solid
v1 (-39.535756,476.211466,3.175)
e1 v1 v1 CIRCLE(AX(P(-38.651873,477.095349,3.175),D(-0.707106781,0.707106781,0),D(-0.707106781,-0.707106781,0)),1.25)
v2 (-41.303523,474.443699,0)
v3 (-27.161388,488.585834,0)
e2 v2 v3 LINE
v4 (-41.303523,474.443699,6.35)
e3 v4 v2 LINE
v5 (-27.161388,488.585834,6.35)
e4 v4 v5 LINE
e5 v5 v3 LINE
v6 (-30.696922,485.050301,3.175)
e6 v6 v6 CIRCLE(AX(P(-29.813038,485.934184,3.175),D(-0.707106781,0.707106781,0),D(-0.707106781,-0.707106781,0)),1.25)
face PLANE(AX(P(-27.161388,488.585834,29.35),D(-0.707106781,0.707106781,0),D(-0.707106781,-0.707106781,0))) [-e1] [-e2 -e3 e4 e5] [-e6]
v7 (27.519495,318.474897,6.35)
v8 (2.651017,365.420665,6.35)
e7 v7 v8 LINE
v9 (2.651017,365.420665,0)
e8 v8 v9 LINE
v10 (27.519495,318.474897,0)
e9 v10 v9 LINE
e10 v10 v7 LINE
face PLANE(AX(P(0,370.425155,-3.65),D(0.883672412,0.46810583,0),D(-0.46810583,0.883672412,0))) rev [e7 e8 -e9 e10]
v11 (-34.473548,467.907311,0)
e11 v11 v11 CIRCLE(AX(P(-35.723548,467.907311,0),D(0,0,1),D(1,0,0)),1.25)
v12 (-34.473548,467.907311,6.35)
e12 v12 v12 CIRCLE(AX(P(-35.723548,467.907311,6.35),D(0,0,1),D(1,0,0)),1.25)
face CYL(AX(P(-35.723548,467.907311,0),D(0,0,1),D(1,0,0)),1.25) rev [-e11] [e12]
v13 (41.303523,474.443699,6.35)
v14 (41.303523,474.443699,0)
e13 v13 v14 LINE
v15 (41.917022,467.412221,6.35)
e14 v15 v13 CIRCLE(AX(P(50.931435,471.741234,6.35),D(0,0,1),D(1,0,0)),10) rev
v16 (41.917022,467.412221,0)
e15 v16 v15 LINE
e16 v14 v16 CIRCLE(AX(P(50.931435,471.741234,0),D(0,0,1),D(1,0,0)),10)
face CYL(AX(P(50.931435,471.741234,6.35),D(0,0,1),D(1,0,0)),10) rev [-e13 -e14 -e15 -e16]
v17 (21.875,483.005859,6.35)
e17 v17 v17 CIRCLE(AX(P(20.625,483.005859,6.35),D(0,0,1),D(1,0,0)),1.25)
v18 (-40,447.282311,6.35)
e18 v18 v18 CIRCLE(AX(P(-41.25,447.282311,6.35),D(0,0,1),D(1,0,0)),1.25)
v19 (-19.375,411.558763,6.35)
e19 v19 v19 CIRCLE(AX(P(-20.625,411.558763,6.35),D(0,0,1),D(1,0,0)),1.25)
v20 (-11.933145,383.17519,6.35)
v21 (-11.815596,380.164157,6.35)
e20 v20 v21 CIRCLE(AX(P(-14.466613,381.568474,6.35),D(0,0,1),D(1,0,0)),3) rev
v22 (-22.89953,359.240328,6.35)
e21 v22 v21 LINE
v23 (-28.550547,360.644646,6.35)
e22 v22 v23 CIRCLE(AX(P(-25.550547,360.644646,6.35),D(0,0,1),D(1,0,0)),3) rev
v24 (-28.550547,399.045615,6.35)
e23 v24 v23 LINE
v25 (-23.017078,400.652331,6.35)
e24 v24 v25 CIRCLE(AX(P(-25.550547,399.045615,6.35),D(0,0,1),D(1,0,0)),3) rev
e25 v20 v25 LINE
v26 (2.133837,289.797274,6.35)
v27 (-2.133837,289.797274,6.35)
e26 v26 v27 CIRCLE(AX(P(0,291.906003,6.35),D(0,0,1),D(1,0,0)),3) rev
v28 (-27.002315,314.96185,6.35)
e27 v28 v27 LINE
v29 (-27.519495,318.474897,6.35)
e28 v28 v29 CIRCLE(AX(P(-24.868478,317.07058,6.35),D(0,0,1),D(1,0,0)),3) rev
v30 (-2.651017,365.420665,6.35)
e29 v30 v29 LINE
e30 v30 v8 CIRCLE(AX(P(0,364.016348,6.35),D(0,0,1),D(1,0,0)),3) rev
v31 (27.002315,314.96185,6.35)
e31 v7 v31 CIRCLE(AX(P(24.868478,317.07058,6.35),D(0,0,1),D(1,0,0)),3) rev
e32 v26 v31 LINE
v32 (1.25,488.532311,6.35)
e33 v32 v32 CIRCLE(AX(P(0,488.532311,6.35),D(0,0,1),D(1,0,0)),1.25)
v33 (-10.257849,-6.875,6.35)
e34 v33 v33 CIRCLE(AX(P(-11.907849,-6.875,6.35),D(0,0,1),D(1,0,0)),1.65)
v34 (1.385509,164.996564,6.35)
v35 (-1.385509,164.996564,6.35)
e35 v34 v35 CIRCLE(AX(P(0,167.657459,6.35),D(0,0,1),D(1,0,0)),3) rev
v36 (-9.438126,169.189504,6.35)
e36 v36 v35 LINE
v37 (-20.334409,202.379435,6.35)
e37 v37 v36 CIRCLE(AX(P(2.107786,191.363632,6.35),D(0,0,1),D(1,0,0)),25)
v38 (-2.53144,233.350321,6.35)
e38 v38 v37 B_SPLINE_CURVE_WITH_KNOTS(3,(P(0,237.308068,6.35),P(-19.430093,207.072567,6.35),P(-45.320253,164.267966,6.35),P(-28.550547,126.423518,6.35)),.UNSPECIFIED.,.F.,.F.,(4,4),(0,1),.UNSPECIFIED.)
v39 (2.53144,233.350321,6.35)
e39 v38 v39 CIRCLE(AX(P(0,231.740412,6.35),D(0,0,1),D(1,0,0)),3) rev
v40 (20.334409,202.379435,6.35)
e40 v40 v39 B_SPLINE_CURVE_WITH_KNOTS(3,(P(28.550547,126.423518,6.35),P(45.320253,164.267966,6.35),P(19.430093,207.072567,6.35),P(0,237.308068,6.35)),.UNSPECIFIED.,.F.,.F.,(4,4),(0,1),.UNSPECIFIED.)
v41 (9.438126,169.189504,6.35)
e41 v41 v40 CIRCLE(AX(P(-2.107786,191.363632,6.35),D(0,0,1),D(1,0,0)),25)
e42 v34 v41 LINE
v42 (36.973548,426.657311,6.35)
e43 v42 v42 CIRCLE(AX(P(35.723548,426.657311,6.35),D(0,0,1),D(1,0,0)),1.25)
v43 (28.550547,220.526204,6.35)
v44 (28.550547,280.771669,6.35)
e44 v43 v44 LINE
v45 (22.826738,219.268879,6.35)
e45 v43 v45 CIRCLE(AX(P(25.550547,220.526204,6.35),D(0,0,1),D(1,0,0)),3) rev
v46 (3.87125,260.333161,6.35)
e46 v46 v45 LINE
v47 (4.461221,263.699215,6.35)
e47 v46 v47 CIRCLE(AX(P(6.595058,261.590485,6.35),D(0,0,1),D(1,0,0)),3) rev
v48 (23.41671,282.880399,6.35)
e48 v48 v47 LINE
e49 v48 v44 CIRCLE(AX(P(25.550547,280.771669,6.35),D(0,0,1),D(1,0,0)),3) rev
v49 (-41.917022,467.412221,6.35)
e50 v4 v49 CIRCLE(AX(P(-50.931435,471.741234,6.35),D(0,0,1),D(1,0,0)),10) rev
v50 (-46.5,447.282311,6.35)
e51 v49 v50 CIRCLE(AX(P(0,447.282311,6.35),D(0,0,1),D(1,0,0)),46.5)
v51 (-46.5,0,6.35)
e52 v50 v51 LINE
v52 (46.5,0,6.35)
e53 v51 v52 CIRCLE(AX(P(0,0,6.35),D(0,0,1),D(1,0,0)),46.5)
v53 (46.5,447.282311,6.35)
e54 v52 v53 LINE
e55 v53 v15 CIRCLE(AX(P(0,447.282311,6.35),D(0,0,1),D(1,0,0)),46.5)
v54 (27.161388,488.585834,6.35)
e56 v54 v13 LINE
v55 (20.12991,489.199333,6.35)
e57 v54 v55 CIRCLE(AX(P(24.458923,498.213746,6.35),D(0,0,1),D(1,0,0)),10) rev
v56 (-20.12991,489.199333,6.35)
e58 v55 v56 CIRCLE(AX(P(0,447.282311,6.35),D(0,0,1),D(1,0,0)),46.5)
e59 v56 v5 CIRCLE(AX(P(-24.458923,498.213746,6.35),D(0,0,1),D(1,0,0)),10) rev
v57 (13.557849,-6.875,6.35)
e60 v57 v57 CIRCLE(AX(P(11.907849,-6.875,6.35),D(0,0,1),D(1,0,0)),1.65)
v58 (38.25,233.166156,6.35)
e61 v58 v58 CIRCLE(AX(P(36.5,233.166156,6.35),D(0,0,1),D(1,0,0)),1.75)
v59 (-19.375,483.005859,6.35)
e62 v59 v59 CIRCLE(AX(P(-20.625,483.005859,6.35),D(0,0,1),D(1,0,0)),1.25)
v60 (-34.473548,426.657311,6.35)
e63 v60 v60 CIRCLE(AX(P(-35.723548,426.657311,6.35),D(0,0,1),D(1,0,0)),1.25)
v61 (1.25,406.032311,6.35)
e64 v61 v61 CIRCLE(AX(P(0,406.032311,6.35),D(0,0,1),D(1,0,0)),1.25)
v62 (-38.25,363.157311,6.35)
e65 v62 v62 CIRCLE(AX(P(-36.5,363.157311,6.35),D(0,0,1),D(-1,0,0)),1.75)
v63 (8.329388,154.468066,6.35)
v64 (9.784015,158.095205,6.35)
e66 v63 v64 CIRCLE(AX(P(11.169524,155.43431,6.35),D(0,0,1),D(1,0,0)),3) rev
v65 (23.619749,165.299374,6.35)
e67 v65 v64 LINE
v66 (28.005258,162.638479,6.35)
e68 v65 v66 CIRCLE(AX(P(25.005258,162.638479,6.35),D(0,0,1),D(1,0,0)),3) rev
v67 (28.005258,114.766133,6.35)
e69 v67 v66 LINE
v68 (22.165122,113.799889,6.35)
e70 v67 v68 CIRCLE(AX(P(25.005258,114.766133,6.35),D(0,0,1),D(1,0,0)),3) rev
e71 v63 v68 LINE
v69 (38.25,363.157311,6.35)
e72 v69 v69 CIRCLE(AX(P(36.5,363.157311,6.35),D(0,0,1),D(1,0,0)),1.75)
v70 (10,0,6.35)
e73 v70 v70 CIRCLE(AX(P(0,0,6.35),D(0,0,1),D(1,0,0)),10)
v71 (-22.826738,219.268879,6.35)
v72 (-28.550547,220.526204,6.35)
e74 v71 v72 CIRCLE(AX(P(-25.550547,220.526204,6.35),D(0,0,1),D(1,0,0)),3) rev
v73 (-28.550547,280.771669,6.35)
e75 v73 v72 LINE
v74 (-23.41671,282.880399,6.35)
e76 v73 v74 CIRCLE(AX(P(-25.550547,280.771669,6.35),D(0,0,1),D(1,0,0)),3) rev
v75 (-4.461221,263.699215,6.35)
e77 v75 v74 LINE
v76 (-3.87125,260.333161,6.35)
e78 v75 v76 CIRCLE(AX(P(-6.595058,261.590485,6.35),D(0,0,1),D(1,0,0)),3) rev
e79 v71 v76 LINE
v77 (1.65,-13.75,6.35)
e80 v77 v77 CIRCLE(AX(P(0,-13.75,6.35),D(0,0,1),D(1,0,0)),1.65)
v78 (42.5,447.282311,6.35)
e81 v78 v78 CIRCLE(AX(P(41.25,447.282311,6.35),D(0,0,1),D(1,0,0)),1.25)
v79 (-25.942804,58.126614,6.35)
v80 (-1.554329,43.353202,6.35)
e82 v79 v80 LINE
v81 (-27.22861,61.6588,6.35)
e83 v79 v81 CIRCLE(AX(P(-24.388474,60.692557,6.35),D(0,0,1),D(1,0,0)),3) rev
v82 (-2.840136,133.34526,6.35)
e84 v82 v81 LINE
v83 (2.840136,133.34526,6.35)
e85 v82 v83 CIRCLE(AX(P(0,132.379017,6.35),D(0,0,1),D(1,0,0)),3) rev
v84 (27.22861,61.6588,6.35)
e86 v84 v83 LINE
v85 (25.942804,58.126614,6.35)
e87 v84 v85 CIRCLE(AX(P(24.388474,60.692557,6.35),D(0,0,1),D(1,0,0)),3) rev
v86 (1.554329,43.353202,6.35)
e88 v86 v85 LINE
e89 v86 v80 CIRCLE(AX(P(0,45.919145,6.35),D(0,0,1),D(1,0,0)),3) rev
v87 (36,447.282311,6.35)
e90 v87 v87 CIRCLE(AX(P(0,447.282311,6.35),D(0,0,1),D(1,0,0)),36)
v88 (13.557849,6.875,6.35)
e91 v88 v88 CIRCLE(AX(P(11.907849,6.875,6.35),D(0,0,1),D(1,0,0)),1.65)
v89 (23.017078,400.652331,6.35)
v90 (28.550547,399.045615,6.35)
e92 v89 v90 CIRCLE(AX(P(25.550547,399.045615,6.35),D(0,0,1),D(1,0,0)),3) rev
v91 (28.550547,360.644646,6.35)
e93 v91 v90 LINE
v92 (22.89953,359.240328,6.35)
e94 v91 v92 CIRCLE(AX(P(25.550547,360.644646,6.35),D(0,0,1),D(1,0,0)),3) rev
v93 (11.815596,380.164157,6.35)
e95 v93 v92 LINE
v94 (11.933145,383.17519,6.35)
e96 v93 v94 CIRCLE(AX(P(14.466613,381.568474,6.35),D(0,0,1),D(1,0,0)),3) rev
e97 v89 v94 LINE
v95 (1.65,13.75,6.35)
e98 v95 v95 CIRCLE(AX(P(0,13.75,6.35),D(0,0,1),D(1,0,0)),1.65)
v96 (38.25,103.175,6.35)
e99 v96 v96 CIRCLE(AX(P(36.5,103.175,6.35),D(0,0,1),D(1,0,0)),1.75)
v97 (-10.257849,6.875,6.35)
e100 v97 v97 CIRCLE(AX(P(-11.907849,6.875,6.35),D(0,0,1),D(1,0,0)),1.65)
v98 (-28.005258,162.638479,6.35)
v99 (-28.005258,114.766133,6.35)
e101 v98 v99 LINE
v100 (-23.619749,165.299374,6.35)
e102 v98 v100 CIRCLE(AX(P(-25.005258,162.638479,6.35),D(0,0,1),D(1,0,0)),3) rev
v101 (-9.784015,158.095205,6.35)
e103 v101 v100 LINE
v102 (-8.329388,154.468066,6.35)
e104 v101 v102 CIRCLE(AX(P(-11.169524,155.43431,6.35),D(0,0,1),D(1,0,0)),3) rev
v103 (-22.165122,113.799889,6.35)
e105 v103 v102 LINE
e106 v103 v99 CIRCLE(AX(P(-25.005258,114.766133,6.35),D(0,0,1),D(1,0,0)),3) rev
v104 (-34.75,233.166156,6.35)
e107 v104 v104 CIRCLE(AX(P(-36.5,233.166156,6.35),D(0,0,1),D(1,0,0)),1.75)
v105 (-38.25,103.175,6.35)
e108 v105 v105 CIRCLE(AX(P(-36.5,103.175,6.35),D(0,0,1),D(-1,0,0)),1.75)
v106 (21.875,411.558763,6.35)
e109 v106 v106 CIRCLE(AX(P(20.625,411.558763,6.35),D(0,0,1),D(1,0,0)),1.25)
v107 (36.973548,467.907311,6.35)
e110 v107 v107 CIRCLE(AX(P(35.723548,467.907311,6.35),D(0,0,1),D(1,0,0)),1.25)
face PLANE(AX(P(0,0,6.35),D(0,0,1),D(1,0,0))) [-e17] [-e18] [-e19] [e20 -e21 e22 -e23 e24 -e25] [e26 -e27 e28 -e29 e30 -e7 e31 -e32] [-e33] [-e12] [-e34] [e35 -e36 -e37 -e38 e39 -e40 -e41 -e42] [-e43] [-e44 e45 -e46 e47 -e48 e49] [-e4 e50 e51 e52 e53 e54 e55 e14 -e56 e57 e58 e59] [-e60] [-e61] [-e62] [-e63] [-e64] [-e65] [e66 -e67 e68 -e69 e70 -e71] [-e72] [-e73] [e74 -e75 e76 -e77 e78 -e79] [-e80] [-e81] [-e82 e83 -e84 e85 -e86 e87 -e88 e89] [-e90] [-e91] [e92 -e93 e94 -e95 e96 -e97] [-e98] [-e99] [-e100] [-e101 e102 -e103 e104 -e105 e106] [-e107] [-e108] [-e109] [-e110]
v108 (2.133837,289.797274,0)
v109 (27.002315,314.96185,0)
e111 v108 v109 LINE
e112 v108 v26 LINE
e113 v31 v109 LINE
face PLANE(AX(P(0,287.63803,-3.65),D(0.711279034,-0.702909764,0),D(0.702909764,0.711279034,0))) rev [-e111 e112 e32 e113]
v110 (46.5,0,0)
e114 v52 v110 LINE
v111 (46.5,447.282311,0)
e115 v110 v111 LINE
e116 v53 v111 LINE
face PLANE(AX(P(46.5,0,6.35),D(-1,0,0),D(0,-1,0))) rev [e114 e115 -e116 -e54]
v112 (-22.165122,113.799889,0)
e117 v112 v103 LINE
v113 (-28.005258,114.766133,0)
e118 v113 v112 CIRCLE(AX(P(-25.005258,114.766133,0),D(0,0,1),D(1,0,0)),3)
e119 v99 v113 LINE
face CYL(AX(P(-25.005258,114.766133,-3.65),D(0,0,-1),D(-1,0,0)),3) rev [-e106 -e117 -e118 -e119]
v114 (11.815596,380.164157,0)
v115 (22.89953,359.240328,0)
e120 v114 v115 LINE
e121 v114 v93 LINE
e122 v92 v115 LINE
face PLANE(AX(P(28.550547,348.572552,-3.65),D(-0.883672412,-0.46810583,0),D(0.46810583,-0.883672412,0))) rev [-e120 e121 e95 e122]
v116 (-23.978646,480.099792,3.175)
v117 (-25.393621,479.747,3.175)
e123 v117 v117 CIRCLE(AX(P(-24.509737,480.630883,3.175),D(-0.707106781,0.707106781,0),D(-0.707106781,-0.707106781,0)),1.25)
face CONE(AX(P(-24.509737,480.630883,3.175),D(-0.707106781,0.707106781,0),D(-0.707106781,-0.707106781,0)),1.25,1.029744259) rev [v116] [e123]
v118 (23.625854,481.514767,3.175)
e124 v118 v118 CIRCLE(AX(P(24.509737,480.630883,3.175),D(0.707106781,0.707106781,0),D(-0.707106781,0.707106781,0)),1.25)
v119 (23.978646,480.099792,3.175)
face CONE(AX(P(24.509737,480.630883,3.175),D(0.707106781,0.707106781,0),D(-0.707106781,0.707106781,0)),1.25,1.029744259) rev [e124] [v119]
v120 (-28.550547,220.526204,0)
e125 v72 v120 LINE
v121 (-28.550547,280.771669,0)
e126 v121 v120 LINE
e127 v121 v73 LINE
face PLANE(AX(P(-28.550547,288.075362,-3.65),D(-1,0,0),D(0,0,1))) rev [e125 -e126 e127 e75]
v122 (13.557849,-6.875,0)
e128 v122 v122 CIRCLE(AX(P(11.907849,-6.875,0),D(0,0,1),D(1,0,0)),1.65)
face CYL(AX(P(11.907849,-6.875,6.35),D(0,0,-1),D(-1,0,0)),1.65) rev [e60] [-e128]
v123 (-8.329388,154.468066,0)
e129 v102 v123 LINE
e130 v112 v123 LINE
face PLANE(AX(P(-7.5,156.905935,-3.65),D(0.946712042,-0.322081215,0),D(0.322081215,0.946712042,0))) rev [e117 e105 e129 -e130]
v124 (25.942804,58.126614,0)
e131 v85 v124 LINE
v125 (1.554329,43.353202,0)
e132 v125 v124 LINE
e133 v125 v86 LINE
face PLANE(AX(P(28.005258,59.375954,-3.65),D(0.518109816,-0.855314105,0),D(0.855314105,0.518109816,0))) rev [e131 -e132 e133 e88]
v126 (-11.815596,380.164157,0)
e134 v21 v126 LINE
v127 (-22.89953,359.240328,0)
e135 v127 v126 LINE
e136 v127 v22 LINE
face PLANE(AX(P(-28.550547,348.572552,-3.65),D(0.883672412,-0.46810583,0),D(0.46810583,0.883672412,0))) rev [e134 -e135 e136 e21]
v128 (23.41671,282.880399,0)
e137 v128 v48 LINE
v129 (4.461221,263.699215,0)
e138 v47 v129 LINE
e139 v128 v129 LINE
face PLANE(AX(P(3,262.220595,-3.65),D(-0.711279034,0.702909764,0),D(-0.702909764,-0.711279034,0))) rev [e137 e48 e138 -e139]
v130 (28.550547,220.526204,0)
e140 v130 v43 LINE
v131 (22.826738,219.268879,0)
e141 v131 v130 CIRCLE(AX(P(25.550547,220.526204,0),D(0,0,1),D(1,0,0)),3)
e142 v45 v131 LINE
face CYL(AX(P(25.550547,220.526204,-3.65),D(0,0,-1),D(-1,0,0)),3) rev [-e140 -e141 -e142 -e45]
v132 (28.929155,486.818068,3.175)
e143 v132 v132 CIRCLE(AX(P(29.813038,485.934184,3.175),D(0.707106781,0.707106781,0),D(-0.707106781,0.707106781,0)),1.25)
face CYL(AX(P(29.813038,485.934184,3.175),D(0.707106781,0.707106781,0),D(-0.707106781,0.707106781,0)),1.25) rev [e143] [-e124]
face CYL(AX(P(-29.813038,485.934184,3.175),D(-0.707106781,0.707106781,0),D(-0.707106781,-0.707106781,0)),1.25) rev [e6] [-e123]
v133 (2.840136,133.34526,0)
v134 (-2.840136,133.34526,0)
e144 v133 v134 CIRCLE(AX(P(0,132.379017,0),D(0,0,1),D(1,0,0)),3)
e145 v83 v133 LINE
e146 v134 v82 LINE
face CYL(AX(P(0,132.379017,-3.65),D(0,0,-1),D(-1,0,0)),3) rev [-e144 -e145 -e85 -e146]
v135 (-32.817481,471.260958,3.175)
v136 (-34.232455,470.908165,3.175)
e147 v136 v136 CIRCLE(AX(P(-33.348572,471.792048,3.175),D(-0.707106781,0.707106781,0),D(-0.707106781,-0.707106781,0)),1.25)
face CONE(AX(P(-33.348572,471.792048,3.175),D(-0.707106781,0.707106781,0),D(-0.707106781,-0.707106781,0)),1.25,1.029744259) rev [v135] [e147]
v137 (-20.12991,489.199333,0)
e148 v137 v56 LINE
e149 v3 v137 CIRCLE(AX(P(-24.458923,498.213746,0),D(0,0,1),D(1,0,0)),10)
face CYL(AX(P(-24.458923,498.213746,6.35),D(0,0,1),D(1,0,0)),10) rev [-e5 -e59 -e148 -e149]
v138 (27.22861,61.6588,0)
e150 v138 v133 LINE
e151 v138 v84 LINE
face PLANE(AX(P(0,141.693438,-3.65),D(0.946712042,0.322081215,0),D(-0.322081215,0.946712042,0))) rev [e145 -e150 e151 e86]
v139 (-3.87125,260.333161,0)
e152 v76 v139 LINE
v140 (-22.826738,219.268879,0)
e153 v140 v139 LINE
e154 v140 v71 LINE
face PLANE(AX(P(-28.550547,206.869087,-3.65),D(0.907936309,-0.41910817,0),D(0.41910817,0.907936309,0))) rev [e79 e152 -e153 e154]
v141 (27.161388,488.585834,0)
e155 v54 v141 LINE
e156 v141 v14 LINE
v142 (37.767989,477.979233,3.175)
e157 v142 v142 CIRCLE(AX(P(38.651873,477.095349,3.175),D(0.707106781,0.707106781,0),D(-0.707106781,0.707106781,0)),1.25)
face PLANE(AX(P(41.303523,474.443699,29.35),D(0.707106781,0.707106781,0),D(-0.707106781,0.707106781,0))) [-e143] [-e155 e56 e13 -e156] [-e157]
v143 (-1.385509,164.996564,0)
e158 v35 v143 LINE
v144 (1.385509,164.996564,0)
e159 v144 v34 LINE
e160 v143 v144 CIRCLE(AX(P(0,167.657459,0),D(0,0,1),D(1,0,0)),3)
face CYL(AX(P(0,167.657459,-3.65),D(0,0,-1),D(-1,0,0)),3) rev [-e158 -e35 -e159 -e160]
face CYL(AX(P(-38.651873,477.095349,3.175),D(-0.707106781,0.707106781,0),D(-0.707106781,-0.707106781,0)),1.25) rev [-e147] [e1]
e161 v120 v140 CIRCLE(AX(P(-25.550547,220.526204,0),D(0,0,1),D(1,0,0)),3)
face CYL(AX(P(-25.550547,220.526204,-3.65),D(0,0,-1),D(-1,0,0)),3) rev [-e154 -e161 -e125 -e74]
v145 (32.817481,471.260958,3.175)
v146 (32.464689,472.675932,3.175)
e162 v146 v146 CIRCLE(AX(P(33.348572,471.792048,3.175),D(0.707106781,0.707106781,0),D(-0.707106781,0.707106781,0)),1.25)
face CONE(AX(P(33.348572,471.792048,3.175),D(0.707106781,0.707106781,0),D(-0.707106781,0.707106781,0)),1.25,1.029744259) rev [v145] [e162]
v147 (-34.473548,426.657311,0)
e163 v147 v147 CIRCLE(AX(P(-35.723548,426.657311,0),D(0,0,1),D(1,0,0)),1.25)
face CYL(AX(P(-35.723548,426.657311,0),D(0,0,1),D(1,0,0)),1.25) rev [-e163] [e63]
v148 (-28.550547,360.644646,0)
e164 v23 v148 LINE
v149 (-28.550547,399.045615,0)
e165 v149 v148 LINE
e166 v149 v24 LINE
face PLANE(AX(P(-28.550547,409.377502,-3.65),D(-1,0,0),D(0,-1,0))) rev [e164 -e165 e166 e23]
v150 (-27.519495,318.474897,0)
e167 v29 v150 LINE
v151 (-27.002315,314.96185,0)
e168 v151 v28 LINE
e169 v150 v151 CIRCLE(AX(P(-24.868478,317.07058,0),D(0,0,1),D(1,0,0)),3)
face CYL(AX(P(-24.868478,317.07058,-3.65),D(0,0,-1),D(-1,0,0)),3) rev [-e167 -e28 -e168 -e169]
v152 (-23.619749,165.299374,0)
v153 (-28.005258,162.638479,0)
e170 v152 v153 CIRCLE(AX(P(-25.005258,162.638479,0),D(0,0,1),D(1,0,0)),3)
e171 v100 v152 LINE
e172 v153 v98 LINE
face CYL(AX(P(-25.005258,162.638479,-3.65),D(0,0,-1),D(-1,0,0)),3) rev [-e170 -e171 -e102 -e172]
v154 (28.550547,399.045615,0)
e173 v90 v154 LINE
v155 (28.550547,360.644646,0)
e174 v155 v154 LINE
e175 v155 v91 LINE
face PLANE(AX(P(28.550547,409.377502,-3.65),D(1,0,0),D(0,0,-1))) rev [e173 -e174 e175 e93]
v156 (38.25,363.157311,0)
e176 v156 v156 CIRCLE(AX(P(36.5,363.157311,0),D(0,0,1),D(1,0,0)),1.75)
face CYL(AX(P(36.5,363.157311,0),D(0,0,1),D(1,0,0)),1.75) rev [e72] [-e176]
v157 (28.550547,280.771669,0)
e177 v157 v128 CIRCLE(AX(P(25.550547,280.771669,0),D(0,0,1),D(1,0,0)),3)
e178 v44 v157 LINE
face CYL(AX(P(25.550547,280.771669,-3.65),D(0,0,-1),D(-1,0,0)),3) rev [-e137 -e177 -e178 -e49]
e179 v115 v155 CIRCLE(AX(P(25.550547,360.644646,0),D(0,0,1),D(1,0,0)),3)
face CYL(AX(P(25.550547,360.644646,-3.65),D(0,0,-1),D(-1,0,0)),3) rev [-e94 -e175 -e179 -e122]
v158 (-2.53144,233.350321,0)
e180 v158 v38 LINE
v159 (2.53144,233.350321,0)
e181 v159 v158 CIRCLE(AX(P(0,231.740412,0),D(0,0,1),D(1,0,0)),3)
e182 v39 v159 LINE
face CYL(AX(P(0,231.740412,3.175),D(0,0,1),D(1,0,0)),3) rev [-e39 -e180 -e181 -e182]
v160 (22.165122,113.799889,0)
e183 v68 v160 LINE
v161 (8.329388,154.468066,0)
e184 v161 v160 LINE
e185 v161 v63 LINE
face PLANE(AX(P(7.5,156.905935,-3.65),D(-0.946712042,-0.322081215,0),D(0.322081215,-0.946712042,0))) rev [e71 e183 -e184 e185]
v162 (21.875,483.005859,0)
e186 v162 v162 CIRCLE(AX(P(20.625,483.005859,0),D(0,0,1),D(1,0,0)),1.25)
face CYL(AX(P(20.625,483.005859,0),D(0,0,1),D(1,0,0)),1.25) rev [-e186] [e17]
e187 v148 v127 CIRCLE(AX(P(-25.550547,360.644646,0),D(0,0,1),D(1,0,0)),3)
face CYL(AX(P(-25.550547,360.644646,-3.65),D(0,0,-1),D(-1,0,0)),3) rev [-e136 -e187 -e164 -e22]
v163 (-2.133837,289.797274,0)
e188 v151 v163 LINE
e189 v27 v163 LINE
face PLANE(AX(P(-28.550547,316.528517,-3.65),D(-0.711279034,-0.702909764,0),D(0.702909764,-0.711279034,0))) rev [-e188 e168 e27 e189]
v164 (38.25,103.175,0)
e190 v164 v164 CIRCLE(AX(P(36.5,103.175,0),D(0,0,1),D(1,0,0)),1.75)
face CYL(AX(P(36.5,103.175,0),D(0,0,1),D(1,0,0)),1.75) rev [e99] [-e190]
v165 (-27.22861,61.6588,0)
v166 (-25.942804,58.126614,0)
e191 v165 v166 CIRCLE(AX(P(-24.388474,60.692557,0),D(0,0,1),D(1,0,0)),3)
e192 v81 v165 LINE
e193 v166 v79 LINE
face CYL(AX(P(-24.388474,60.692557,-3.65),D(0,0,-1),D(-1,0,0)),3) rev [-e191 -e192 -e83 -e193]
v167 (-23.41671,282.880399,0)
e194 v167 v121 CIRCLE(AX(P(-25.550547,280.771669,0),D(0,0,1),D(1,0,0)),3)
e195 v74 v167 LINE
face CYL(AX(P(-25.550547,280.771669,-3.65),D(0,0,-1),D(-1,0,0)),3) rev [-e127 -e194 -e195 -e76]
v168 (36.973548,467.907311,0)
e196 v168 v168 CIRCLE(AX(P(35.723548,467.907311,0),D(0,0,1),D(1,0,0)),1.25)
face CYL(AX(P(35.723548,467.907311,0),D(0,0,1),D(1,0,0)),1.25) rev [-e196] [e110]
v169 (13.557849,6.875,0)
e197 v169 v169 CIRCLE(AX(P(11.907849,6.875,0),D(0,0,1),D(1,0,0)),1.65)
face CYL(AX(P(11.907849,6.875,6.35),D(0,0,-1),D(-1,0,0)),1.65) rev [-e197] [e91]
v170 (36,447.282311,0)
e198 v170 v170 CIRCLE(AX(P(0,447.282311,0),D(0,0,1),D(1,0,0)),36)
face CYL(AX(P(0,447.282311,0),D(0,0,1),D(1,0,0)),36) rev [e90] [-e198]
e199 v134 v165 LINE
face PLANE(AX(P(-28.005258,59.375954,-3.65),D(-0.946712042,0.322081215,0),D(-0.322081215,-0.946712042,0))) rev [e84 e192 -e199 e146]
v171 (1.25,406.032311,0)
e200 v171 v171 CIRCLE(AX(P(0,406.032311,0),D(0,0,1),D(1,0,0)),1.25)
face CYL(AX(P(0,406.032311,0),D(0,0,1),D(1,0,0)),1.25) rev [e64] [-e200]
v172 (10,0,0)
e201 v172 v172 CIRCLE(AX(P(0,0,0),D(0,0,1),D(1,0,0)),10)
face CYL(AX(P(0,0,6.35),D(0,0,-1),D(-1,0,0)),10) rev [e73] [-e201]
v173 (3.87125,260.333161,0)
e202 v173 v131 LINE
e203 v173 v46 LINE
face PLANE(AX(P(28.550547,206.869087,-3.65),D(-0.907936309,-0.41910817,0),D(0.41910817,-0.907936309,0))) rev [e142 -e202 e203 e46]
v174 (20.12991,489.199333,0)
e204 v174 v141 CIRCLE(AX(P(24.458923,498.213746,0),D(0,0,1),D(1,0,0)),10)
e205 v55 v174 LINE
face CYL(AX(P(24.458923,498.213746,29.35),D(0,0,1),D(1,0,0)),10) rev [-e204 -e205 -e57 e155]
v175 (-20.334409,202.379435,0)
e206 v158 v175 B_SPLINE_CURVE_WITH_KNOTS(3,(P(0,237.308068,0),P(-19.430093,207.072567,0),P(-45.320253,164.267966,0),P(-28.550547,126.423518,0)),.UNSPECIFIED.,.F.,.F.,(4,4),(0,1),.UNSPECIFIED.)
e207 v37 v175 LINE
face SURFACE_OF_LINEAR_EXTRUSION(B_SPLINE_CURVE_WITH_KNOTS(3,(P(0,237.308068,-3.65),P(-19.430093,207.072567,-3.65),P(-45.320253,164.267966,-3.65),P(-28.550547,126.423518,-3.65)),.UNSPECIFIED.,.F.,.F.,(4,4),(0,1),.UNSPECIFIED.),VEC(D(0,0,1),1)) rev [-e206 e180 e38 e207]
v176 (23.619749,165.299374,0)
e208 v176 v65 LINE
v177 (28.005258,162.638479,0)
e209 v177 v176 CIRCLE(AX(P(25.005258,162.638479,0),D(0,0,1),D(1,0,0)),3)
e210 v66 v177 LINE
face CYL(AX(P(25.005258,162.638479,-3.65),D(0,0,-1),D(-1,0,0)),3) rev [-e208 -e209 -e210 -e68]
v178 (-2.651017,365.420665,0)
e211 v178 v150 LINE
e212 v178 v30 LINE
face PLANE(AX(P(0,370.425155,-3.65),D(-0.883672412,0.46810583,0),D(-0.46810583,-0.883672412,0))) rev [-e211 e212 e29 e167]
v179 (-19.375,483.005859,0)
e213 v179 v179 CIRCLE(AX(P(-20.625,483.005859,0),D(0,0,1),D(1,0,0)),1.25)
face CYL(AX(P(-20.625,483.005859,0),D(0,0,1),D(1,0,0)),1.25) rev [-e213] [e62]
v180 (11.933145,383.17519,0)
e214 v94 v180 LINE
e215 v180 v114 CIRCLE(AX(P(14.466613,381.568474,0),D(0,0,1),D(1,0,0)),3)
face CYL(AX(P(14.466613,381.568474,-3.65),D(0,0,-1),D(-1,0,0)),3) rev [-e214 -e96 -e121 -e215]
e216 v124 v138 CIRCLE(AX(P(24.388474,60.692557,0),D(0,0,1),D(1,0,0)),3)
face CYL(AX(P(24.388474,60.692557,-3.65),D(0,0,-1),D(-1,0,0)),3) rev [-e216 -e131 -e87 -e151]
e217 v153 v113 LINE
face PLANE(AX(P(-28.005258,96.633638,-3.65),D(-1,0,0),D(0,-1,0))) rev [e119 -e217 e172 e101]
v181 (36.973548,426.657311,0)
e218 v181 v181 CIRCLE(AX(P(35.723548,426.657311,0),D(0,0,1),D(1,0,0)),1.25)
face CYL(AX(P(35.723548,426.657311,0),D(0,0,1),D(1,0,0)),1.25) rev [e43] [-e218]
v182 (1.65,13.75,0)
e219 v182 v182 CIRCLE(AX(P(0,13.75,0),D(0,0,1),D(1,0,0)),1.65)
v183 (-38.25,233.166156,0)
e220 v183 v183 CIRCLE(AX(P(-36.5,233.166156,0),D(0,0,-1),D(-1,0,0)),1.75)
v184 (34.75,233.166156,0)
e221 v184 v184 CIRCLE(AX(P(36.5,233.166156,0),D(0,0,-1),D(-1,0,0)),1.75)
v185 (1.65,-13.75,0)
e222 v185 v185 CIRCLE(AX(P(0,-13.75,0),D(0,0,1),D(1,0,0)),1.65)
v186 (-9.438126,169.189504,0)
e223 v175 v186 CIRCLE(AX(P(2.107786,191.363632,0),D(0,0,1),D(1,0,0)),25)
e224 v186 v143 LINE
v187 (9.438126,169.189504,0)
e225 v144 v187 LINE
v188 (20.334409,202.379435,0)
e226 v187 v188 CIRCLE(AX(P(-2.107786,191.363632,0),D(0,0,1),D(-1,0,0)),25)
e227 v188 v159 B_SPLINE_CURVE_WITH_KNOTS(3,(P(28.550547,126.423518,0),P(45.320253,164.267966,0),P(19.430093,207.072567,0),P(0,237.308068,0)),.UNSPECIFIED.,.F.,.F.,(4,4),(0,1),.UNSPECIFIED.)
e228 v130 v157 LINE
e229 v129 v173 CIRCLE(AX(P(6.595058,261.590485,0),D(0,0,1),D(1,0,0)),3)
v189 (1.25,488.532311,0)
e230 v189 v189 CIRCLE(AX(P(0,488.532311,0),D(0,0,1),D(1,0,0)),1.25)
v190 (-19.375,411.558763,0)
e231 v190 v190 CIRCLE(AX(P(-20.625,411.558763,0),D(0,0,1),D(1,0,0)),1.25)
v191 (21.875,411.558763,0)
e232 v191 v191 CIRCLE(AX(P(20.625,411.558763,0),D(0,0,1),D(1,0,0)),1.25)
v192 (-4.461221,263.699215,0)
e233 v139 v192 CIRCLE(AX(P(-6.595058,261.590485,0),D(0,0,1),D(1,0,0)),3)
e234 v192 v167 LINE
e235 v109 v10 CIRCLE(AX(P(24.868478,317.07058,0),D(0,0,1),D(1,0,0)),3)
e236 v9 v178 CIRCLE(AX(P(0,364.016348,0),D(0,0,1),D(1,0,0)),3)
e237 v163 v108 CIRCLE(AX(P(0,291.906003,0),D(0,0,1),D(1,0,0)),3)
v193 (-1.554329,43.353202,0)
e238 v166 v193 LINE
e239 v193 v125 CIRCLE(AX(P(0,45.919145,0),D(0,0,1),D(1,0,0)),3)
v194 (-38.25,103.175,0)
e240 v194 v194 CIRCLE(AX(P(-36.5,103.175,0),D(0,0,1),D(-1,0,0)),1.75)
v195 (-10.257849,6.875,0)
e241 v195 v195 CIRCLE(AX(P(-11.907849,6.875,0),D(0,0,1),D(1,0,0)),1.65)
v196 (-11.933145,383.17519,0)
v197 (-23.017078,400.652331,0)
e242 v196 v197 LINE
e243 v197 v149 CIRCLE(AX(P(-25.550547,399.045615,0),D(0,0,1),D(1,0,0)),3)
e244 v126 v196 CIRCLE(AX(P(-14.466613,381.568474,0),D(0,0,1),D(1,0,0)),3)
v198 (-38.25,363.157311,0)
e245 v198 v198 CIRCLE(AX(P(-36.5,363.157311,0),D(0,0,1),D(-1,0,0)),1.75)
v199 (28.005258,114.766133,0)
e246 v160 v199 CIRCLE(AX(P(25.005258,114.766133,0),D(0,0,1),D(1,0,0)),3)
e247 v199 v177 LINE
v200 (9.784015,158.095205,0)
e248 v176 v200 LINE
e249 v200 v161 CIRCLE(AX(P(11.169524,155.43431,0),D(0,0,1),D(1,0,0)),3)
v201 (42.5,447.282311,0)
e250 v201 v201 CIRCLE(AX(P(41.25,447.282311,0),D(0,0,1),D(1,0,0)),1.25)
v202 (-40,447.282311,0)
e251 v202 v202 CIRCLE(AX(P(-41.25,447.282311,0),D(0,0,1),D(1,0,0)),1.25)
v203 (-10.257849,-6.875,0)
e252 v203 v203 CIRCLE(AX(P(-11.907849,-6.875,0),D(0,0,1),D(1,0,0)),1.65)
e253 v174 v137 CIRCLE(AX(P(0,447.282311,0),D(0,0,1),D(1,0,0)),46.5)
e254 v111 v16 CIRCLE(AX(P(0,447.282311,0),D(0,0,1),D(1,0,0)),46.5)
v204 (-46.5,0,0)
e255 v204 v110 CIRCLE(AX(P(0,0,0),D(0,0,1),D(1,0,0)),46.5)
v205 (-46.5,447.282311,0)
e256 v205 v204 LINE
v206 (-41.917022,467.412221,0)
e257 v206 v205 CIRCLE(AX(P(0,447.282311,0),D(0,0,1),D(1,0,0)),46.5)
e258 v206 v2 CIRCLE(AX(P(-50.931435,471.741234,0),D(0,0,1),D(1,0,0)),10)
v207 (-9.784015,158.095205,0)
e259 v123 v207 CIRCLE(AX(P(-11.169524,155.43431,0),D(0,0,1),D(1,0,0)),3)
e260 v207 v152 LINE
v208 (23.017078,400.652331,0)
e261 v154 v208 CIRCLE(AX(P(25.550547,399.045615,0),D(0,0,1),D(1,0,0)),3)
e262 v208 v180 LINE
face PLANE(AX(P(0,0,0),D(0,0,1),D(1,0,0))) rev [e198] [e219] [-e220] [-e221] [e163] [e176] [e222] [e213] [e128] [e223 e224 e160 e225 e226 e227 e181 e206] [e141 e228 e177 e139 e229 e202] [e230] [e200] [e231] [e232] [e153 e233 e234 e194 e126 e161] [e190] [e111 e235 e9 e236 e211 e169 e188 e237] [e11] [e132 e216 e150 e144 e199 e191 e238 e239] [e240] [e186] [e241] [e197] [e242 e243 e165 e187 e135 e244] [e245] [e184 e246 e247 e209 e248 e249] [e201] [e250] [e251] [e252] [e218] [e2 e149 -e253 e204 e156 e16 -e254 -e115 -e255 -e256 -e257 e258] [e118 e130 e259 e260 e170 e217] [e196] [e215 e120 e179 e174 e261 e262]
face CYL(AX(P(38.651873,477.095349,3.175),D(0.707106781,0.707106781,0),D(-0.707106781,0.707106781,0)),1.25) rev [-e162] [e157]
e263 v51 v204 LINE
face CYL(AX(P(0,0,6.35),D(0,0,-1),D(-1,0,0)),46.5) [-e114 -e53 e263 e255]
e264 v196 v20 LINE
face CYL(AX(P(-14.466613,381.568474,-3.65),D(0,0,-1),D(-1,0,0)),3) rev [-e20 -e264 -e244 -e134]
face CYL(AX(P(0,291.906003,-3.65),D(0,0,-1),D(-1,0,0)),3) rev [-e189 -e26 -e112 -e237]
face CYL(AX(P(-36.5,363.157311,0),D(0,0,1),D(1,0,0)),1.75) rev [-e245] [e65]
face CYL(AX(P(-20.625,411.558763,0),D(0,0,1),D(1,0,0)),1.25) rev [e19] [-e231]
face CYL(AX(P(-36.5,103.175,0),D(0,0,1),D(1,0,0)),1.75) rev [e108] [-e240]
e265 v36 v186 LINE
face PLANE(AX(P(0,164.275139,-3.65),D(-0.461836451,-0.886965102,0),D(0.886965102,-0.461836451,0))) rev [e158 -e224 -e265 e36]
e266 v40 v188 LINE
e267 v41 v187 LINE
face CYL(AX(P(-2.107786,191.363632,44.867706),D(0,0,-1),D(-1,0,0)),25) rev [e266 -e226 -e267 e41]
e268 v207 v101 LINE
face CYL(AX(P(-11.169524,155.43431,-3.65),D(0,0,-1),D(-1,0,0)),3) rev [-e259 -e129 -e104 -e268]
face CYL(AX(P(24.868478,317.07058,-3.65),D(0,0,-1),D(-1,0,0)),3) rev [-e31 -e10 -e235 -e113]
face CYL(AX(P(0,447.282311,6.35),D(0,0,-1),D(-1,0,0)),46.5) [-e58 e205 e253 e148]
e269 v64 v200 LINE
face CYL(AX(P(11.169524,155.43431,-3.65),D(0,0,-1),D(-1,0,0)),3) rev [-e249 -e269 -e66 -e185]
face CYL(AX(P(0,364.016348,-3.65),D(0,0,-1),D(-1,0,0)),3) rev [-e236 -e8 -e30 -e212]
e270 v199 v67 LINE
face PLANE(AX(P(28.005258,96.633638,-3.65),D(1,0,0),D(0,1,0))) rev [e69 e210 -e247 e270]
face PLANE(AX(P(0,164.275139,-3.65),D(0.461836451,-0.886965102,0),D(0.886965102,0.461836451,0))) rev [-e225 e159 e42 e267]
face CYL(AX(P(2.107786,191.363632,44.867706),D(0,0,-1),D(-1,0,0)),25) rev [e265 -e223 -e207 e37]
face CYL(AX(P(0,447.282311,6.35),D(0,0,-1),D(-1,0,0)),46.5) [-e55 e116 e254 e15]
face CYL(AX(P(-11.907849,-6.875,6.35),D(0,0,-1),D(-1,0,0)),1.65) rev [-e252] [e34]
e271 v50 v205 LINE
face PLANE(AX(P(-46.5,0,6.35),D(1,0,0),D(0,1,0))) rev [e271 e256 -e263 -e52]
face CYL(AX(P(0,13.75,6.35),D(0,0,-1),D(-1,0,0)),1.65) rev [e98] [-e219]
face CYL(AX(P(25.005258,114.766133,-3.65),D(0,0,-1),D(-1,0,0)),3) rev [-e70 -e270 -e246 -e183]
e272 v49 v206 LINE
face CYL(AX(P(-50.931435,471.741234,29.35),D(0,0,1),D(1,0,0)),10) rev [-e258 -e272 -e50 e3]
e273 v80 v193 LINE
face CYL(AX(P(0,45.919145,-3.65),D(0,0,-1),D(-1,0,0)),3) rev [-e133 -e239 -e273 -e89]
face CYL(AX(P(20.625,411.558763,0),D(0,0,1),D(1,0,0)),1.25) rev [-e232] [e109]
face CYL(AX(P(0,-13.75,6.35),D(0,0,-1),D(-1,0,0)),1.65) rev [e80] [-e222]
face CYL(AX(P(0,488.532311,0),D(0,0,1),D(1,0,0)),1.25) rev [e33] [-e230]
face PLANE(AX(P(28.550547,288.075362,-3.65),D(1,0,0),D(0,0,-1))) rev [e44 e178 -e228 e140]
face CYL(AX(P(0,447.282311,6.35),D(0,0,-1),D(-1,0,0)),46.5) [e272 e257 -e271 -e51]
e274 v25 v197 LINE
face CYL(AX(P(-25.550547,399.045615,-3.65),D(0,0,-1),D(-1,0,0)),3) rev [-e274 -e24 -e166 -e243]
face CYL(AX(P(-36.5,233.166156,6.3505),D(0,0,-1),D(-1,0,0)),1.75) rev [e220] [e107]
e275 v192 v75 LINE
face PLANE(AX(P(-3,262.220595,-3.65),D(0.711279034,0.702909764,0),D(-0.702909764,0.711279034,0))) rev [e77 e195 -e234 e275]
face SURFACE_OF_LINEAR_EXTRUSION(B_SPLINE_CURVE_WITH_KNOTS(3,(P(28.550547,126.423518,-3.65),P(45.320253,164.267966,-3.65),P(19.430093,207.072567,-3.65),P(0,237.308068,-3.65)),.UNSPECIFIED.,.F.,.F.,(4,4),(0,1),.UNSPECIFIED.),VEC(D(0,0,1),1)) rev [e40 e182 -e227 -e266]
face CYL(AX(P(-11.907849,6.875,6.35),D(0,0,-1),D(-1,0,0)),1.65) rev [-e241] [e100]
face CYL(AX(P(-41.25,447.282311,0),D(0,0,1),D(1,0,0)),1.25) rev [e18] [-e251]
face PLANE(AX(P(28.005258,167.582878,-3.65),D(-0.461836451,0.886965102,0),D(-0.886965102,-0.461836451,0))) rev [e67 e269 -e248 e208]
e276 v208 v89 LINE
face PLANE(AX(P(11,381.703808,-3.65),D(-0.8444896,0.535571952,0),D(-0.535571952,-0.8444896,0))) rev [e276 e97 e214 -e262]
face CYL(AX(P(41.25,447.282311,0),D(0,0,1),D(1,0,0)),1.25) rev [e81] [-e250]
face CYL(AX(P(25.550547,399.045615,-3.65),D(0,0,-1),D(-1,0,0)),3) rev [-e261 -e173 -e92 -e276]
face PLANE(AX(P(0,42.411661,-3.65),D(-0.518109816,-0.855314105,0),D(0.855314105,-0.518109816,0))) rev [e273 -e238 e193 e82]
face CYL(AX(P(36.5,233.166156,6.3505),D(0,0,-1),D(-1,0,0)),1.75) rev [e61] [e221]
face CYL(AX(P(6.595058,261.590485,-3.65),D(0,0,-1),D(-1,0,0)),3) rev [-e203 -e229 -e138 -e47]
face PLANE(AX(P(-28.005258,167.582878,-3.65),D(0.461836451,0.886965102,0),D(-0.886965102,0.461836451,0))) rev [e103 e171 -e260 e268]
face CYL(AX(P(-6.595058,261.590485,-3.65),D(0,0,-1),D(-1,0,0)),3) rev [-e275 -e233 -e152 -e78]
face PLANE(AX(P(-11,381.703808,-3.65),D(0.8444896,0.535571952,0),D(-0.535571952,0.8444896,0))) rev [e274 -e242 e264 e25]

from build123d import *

# Parameters (mm, degrees)
SKETCH2_R                            = 10
SKETCH2_R_2                          = 1.65
BOSS_EXTRUDE1_DEPTH                  = 6.35
CUT_EXTRUDE1_DEPTH                   = 10
FILLET3_R                            = 3
SKETCH5_R                            = 1.75
CUT_EXTRUDE2_DEPTH                   = 549.511460792
SKETCH6_R                            = 26.5
CUT_EXTRUDE3_DEPTH                   = 10
BOSS_EXTRUDE2_START                  = -6.35
BOSS_EXTRUDE2_DEPTH                  = 6.35
TAP_DRILL_FOR_M3X0_5_TAP1_AT_2_COUNT = 2
TAP_DRILL_FOR_M3X0_5_TAP1_AT_2_PITCH = 12
CIRPATTERN2_COUNT                    = 2
CIRPATTERN2_ANGLE                    = 90
CUT_EXTRUDE4_DEPTH                   = 549.511460792
SKETCH11_R                           = 36
CUT_EXTRUDE5_DEPTH                   = 549.511460792
CUT_EXTRUDE6_DEPTH                   = 549.511460792
CUT_EXTRUDE6_DEPTH_BACK              = 549.511460792
SKETCH12_R                           = 1.25
SKETCH13_W                           = 93
SKETCH13_H                           = 53.952458561
CUT_EXTRUDE7_DEPTH                   = 549.511460792
BOSS_EXTRUDE3_REACH                  = 319.131
SKETCH14_W                           = 17.515975695
SKETCH14_H                           = 6.35
BOSS_EXTRUDE4_DEPTH                  = 6.35
SKETCH16_R                           = 1.75
CUT_EXTRUDE8_DEPTH                   = 497.007604239
SKETCH17_R                           = 1.75
BOSS_EXTRUDE5_DEPTH                  = 6.35
BOSS_EXTRUDE6_DEPTH                  = 6.35
M3X0_5_TAPPED_HOLE1_AT_2_COUNT       = 2
M3X0_5_TAPPED_HOLE1_AT_2_PITCH       = 12.5
CIRPATTERN3_COUNT                    = 2
CIRPATTERN3_ANGLE                    = 90
FILLET4_R                            = 10


with BuildPart() as part:
    # Sketch2 → Boss-Extrude1 (new body)
    with BuildSketch(Plane.XY):
        with BuildLine():
            Line((-46.5, 0), (-46.5, 500))
            ThreePointArc((-46.5, 500), (0, 546.5), (46.5, 500))
            Line((46.5, 500), (46.5, 0))
            ThreePointArc((46.5, 0), (0, -46.5), (-46.5, 0))
        make_face()
        Circle(SKETCH2_R, mode=Mode.SUBTRACT)
        with Locations((0, 13.75)):
            Circle(SKETCH2_R_2, mode=Mode.SUBTRACT)
        with Locations((11.907849302, 6.875)):
            Circle(SKETCH2_R_2, mode=Mode.SUBTRACT)
        with Locations((11.907849302, -6.875)):
            Circle(SKETCH2_R_2, mode=Mode.SUBTRACT)
        with Locations((0, -13.75)):
            Circle(SKETCH2_R_2, mode=Mode.SUBTRACT)
        with Locations((-11.907849302, -6.875)):
            Circle(SKETCH2_R_2, mode=Mode.SUBTRACT)
        with Locations((-11.907849302, 6.875)):
            Circle(SKETCH2_R_2, mode=Mode.SUBTRACT)
    extrude(amount=BOSS_EXTRUDE1_DEPTH)

    # Sketch4 → Cut-Extrude1 (cut)
    with BuildSketch(Plane.XY.offset(6.35)):
        Polygon((28.005258112, 59.37595418), (0, 42.411661153), (-28.005258112, 59.37595418), (0, 141.693437584), align=None)
        Polygon((-7.5, 156.905935087), (-28.005258112, 96.633637735), (-28.005258112, 167.582877854), align=None)
        Polygon((28.005258112, 167.582877854), (7.5, 156.905935087), (28.005258112, 96.633637735), align=None)
        with BuildLine():
            Line((0, 164.275138905), (28.550546746, 179.141206521))
            add(Edge.make_bspline(
                [(28.550546746, 179.141206521), (45.32025339, 216.985654627), (19.430092874, 259.790255689), (0, 290.025756679)],
                knots=[0, 0, 0, 0, 1, 1, 1, 1], degree=3))
            add(Edge.make_bspline(
                [(-28.550546746, 179.141206521), (-45.32025339, 216.985654627), (-19.430092874, 259.790255689), (0, 290.025756679)],
                knots=[0, 0, 0, 0, 1, 1, 1, 1], degree=3))
            Line((-28.550546746, 179.141206521), (0, 164.275138905))
        make_face()
        Polygon((28.550546746, 259.58677623), (3, 314.938284003), (28.550546746, 340.793051053), align=None)
        Polygon((-3, 314.938284003), (-28.550546746, 340.793051053), (-28.550546746, 259.58677623), align=None)
        Polygon((0, 423.142843498), (-28.550546746, 369.246205395), (0, 340.355718526), (28.550546746, 369.246205395), align=None)
        Polygon((-28.550546746, 462.095190817), (-28.550546746, 401.290241252), (-11, 434.421497018), align=None)
        Polygon((28.550546746, 401.290241252), (11, 434.421497018), (28.550546746, 462.095190817), align=None)
    extrude(amount=-CUT_EXTRUDE1_DEPTH, mode=Mode.SUBTRACT)

    # Fillet3
    fillet3_edges = [part.edges().sort_by_distance(p)[0] for p in [
        (-11, 434.421497018, 3.175),
        (-28.550546746, 401.290241252, 3.175),
        (28.550546746, 401.290241252, 3.175),
        (11, 434.421497018, 3.175),
        (28.550546746, 462.095190817, 3.175),
        (-28.550546746, 462.095190817, 3.175),
        (0, 423.142843498, 3.175),
        (-28.550546746, 369.246205395, 3.175),
        (28.550546746, 369.246205395, 3.175),
        (0, 340.355718526, 3.175),
        (28.550546746, 340.793051053, 3.175),
        (-28.550546746, 340.793051053, 3.175),
        (-3, 314.938284003, 3.175),
        (3, 314.938284003, 3.175),
        (28.550546746, 259.58677623, 3.175),
        (-28.550546746, 259.58677623, 3.175),
        (28.550546746, 179.141206521, 3.175),
        (0, 290.025756679, 3.175),
        (-28.550546746, 179.141206521, 3.175),
        (0, 164.275138905, 3.175),
        (-28.005258112, 96.633637735, 3.175),
        (28.005258112, 96.633637735, 3.175),
        (7.5, 156.905935087, 3.175),
        (-28.005258112, 167.582877854, 3.175),
        (28.005258112, 167.582877854, 3.175),
        (0, 141.693437584, 3.175),
        (28.005258112, 59.37595418, 3.175),
        (-28.005258112, 59.37595418, 3.175),
        (0, 42.411661153, 3.175),
        (-7.5, 156.905935087, 3.175),
    ]]
    fillet(fillet3_edges, radius=FILLET3_R)

    # Sketch5 → Cut-Extrude2 (cut, through all)
    with BuildSketch(Plane.XY.offset(6.35)):
        with Locations((36.5, 103.175)):
            Circle(SKETCH5_R)
        with Locations(Location((-36.5, 103.175, 0), (0, 0, 180))):
            Circle(SKETCH5_R)
        with Locations(Location((36.5, 259.525, 0), (0, 0, 180))):
            Circle(SKETCH5_R)
        with Locations((-36.5, 259.525)):
            Circle(SKETCH5_R)
        with Locations((36.5, 415.875)):
            Circle(SKETCH5_R)
        with Locations(Location((-36.5, 415.875, 0), (0, 0, 180))):
            Circle(SKETCH5_R)
    extrude(amount=-CUT_EXTRUDE2_DEPTH, mode=Mode.SUBTRACT)

    # Sketch6 → Cut-Extrude3 (cut)
    with BuildSketch(Plane.XY.offset(6.35)):
        with Locations((0, 500)):
            Circle(SKETCH6_R)
    extrude(amount=-CUT_EXTRUDE3_DEPTH, mode=Mode.SUBTRACT)

    # Sketch7 → Boss-Extrude2 (add)
    with BuildSketch(Plane.XY.offset(6.35).offset(BOSS_EXTRUDE2_START)):
        with BuildLine():
            Line((44.110383395, 529.968247771), (29.968247771, 544.110383395))
            ThreePointArc((29.968247771, 544.110383395), (23.286397782, 542.399293624), (16.474718596, 543.483717035))
            ThreePointArc((16.474718596, 543.483717035), (32.880465325, 532.880465325), (43.483717035, 516.474718596))
            ThreePointArc((43.483717035, 516.474718596), (42.399293624, 523.286397782), (44.110383395, 529.968247771))
        make_face()
    boss_extrude2 = extrude(amount=BOSS_EXTRUDE2_DEPTH)

    # Sketch9 → Tap Drill for M3x0.5 Tap1 (revolve, cut)
    with BuildSketch(Plane(origin=(32.796674896, 541.28195627, 3.175), x_dir=(-0.7071067811865481, 0.7071067811865469, 0), z_dir=(0, 0, 1))):
        Polygon((0, 0), (0, 5.751075774), (1.25, 5), (1.25, 0), align=None)
    tap_drill_for_m3x0_5_tap1 = revolve(axis=Axis((37.286802956, 545.772084331, 3.175), (-0.7071067811865468, -0.7071067811865482, 0)), mode=Mode.SUBTRACT)

    # Tap Drill for M3x0.5 Tap1 at 2: Tap Drill for M3x0.5 Tap1 ×2
    with Locations(*[Vector(0.7071067811865482, -0.7071067811865468, 0) * (i * TAP_DRILL_FOR_M3X0_5_TAP1_AT_2_PITCH) for i in range(1, TAP_DRILL_FOR_M3X0_5_TAP1_AT_2_COUNT)]):
        add(tap_drill_for_m3x0_5_tap1, mode=Mode.SUBTRACT)

    # CirPattern2: Boss-Extrude2, Tap Drill for M3x0.5 Tap1 ×2 about axis
    cirpattern2_axis = Axis((0, 500, 0), (0, 0, 1))
    add([boss_extrude2.rotate(cirpattern2_axis, i * CIRPATTERN2_ANGLE / (CIRPATTERN2_COUNT - 1)) for i in range(1, CIRPATTERN2_COUNT)])
    add([tap_drill_for_m3x0_5_tap1.rotate(cirpattern2_axis, i * CIRPATTERN2_ANGLE / (CIRPATTERN2_COUNT - 1)) for i in range(1, CIRPATTERN2_COUNT)], mode=Mode.SUBTRACT)

    # CirPattern2 copy 1 sketch → CirPattern2 copy 1 (revolve, cut)
    with BuildSketch(Plane(origin=(-32.796674896, 541.28195627, 3.175), x_dir=(-0.7071067811865445, -0.7071067811865506, 0), z_dir=(0, 0, 1))):
        Polygon((0, 0), (0, 5.751075774), (1.25, 5), (1.25, 0), align=None)
    revolve(axis=Axis((-37.286802956, 545.772084331, 3.175), (0.7071067811865507, -0.7071067811865444, 0)), mode=Mode.SUBTRACT)

    # Sketch10 → Cut-Extrude4 (cut, through all)
    with BuildSketch(Plane.XY.offset(6.35)):
        with BuildLine():
            Line((-43.483717035, 516.474718596), (-63.483717035, 516.474718596))
            ThreePointArc((-63.483717035, 516.474718596), (0, 565.586573942), (63.483717035, 516.474718596))
            Line((63.483717035, 516.474718596), (43.483717035, 516.474718596))
            ThreePointArc((43.483717035, 516.474718596), (0, 546.5), (-43.483717035, 516.474718596))
        make_face()
    extrude(amount=-CUT_EXTRUDE4_DEPTH, mode=Mode.SUBTRACT)

    # Sketch11 → Cut-Extrude5 (cut, through all)
    with BuildSketch(Plane.XY.offset(6.35)):
        with Locations((0, 500)):
            Circle(SKETCH11_R)
    extrude(amount=-CUT_EXTRUDE5_DEPTH, mode=Mode.SUBTRACT)

    # Sketch12 → Cut-Extrude6 (cut, two sides: drawn at the far end of the back side and taken through both)
    with BuildSketch(Plane.XY.offset(6.35).offset(-CUT_EXTRUDE6_DEPTH_BACK)):
        with Locations((0, 541.25)):
            Circle(SKETCH12_R)
        with Locations((20.625, 535.723547906)):
            Circle(SKETCH12_R)
        with Locations((35.723547906, 520.625)):
            Circle(SKETCH12_R)
        with Locations((41.25, 500)):
            Circle(SKETCH12_R)
        with Locations((35.723547906, 479.375)):
            Circle(SKETCH12_R)
        with Locations((20.625, 464.276452094)):
            Circle(SKETCH12_R)
        with Locations((0, 458.75)):
            Circle(SKETCH12_R)
        with Locations((-20.625, 464.276452094)):
            Circle(SKETCH12_R)
        with Locations((-35.723547906, 479.375)):
            Circle(SKETCH12_R)
        with Locations((-41.25, 500)):
            Circle(SKETCH12_R)
        with Locations((-35.723547906, 520.625)):
            Circle(SKETCH12_R)
        with Locations((-20.625, 535.723547906)):
            Circle(SKETCH12_R)
    extrude(amount=CUT_EXTRUDE6_DEPTH + CUT_EXTRUDE6_DEPTH_BACK, mode=Mode.SUBTRACT)

    # Sketch13 → Cut-Extrude7 (cut, through all)
    with BuildSketch(Plane(origin=(0, 0, 0), x_dir=(-1, 0, 0), z_dir=(0, 0, -1))):
        with Locations((0, 207.119171895)):
            Rectangle(SKETCH13_W, SKETCH13_H)
    extrude(amount=-CUT_EXTRUDE7_DEPTH, mode=Mode.SUBTRACT)


with BuildPart() as cut_extrude7_piece_1:
    # of the separate pieces the step leaves, piece 1, a body of its own (cut_extrude7_pieces)
    add(part.part.solids().sort_by_distance((46.5, 500, 0))[0])


with BuildPart() as cut_extrude7_piece_2:
    # of the separate pieces the step leaves, piece 2, a body of its own (cut_extrude7_pieces)
    add(part.part.solids().sort_by_distance((46.5, 180.142942614, 0))[0])


with BuildPart() as cut_extrude7_piece_1_1:
    # Body-Move/Copy1: moved
    add(cut_extrude7_piece_1.part.moved(Location((0, -52.7176888, 0))))

    # Boss-Extrude3: up to this face of the body (flat: up to its plane)
    boss_extrude3_end = Plane(cut_extrude7_piece_1_1.part.faces().sort_by_distance((37.742012152, 181.377712375, 3.175))[0])
    # Sketch14 → Boss-Extrude3 (add, up to the picked face)
    with BuildSketch(Plane(origin=(0, 180.142942614, 0), x_dir=(1, 0, 0), z_dir=(0, 1, 0)), mode=Mode.PRIVATE) as boss_extrude3_sk1:
        with Locations((-37.742012153, -3.175)):
            Rectangle(SKETCH14_W, SKETCH14_H)
    boss_extrude3_tool1 = split(extrude(boss_extrude3_sk1.sketch, amount=BOSS_EXTRUDE3_REACH, mode=Mode.PRIVATE), bisect_by=boss_extrude3_end, keep=Keep.BOTH, mode=Mode.PRIVATE)
    # Sketch14 → Boss-Extrude3 (add, up to the picked face)
    with BuildSketch(Plane(origin=(0, 180.142942614, 0), x_dir=(1, 0, 0), z_dir=(0, 1, 0)), mode=Mode.PRIVATE) as boss_extrude3_sk2:
        with Locations((37.742012153, -3.175)):
            Rectangle(SKETCH14_W, SKETCH14_H)
    boss_extrude3_tool2 = split(extrude(boss_extrude3_sk2.sketch, amount=BOSS_EXTRUDE3_REACH, mode=Mode.PRIVATE), bisect_by=boss_extrude3_end, keep=Keep.BOTH, mode=Mode.PRIVATE)

    add(cut_extrude7_piece_2.part)  # Boss-Extrude3 merges Cut-Extrude7 piece 2
    add(boss_extrude3_tool1.solids().sort_by(Axis((-37.742012, 180.142943, 3.175), (0, 1, 0)))[0])
    add(boss_extrude3_tool2.solids().sort_by(Axis((37.742012, 180.142943, 3.175), (0, 1, 0)))[0])

    # Sketch15 → Boss-Extrude4 (add)
    with BuildSketch(Plane(origin=(0, 0, 0), x_dir=(-1, 0, 0), z_dir=(0, 0, -1))):
        with BuildLine():
            Line((28.984024305, 181.377712375), (28.984024305, 180.142942614))
            ThreePointArc((28.984024305, 180.142942614), (28.425309599, 179.275911344), (27.605954054, 178.649363792))
            Line((27.605954054, 178.649363792), (9.43812576, 169.189504186))
            ThreePointArc((9.43812576, 169.189504186), (21.644913421, 183.565600372), (20.334408511, 202.379435266))
            add(Edge.make_bspline(
                [(28.984024305, 181.377712375), (26.665870811, 188.528361062), (23.678798122, 195.56600215), (20.334408511, 202.379435266)],
                knots=[0.471090389, 0.471090389, 0.471090389, 0.471090389, 0.656207947, 0.656207947, 0.656207947, 0.656207947], degree=3))
        make_face()
        with BuildLine():
            Line((-9.43812576, 169.189504186), (-27.605954054, 178.649363792))
            ThreePointArc((-27.605954054, 178.649363792), (-28.425309599, 179.275911344), (-28.984024305, 180.142942614))
            Line((-28.984024305, 180.142942614), (-28.984024304, 181.377712375))
            add(Edge.make_bspline(
                [(-28.984024304, 181.377712375), (-26.665870811, 188.528361062), (-23.678798122, 195.56600215), (-20.334408511, 202.379435266)],
                knots=[0.471090389, 0.471090389, 0.471090389, 0.471090389, 0.656207947, 0.656207947, 0.656207947, 0.656207947], degree=3))
            ThreePointArc((-20.334408511, 202.379435266), (-21.644913421, 183.565600372), (-9.43812576, 169.189504186))
        make_face()
    extrude(amount=-BOSS_EXTRUDE4_DEPTH)

    # Sketch16 → Cut-Extrude8 (cut, through all)
    with BuildSketch(Plane(origin=(0, 0, 0), x_dir=(-1, 0, 0), z_dir=(0, 0, -1))):
        with Locations((36.5, 233.1661556)):
            Circle(SKETCH16_R)
        with Locations((-36.5, 233.1661556)):
            Circle(SKETCH16_R)
    extrude(amount=-CUT_EXTRUDE8_DEPTH, mode=Mode.SUBTRACT)

    # Sketch17 → Boss-Extrude5 (add)
    with BuildSketch(Plane(origin=(0, 0, 0), x_dir=(-1, 0, 0), z_dir=(0, 0, -1))):
        with Locations((36.5, 206.8073112)):
            Circle(SKETCH17_R)
        with Locations((-36.5, 206.8073112)):
            Circle(SKETCH17_R)
    extrude(amount=-BOSS_EXTRUDE5_DEPTH)

    # Sketch18 → Boss-Extrude6 (add)
    with BuildSketch(Plane(origin=(0, 0, 0), x_dir=(-1, 0, 0), z_dir=(0, 0, -1))):
        Polygon((25.040067328, 486.464514152), (27.161387672, 488.585834496), (41.303523296, 474.443698872), (39.182202952, 472.322378528), align=None)
        Polygon((-39.182202952, 472.322378528), (-41.303523296, 474.443698872), (-27.161387672, 488.585834496), (-25.040067328, 486.464514152), align=None)
    extrude(amount=-BOSS_EXTRUDE6_DEPTH)

    # Sketch21 → M3x0.5 Tapped Hole1 (revolve, cut)
    with BuildSketch(Plane(origin=(-29.813038101, 485.934184066, 3.175), x_dir=(-0.707106781186547, -0.7071067811865481, 0), z_dir=(0, 0, 1))):
        Polygon((0, 0), (0, 8.251075774), (1.25, 7.5), (1.25, 0), align=None)
    m3x0_5_tapped_hole1 = revolve(axis=Axis((-34.303166162, 490.424312127, 3.175), (0.7071067811865481, -0.7071067811865469, 0)), mode=Mode.SUBTRACT)

    # M3x0.5 Tapped Hole1 at 2: M3x0.5 Tapped Hole1 ×2
    with Locations(*[Vector(-0.7071067811865469, -0.7071067811865481, 0) * (i * M3X0_5_TAPPED_HOLE1_AT_2_PITCH) for i in range(1, M3X0_5_TAPPED_HOLE1_AT_2_COUNT)]):
        add(m3x0_5_tapped_hole1, mode=Mode.SUBTRACT)

    # CirPattern3: M3x0.5 Tapped Hole1 ×2 about axis
    cirpattern3_axis = Axis((0, 447.2823112, 0), (0, 0, -1))
    for i in range(1, CIRPATTERN3_COUNT):
        add(m3x0_5_tapped_hole1.rotate(cirpattern3_axis, i * CIRPATTERN3_ANGLE / (CIRPATTERN3_COUNT - 1)), mode=Mode.SUBTRACT)

    # CirPattern3 copy 1 sketch → CirPattern3 copy 1 (revolve, cut)
    with BuildSketch(Plane(origin=(29.813038101, 485.934184066, 3.175), x_dir=(-0.7071067811865457, 0.7071067811865495, 0), z_dir=(0, 0, 1))):
        Polygon((0, 0), (0, 8.251075774), (1.25, 7.5), (1.25, 0), align=None)
    revolve(axis=Axis((34.303166162, 490.424312127, 3.175), (-0.7071067811865493, -0.7071067811865457, 0)), mode=Mode.SUBTRACT)

    # Fillet4
    # the kernel refuses this fillet: 10 mm, written as the material it adds along each edge
    with BuildSketch(Plane(origin=(-25.040067328, 486.464514152, 0), x_dir=(-0.7071067811865487, 0.7071067811865464, 0), z_dir=(0, 0, 1)), Plane(origin=(39.182202952, 472.322378528, 0), x_dir=(0.7071067811865666, 0.7071067811865286, 0), z_dir=(0, 0, 1))) as fillet4_piece_1:
        with BuildLine():
            CenterArc((7.897030706, -8.71889272), FILLET4_R, 119.321067137, 41.330757835)
            Line((-1.538196466, -5.405814363), (-1.72690101, -5.339552795))
            ThreePointArc((-1.72690101, -5.339552795), (-0.879713349, -2.671432223), (-0.195320442, 0.043010753))
            Line((-0.195320442, 0.043010753), (0, 0.2))
            ThreePointArc((0, 0.2), (1.5, 0.2), (2.902059386, 0.174377854))
            Line((2.902059386, 0.174377854), (3, 0))
        make_face()
    extrude(amount=6.35)
    with BuildSketch(Plane(origin=(-39.182202952, 472.322378528, 0), x_dir=(-0.486588082362211, -0.8736315230708346, 0), z_dir=(0, 0, 1)), Plane(origin=(25.040067328, 486.464514152, 0), x_dir=(-0.873631523070838, 0.4865880823622048, 0), z_dir=(0, 0, 1))) as fillet4_piece_2:
        with BuildLine():
            CenterArc((6.224742227, -9.981721717), FILLET4_R, 93.464746761, 41.330757835)
            Line((-0.821043125, -2.885461521), (-0.961958832, -2.743536317))
            ThreePointArc((-0.961958832, -2.743536317), (-0.602885664, -1.387994552), (-0.192364101, 0.054736208))
            Line((-0.192364101, 0.054736208), (0.012086878, 0.199634434))
            ThreePointArc((0.012086878, 0.199634434), (2.810199161, 0.115005986), (5.608311443, 0.199634434))
            Line((5.608311443, 0.199634434), (5.620398321, 0))
        make_face()
    extrude(amount=6.35)


solid = cut_extrude7_piece_1_1.part
